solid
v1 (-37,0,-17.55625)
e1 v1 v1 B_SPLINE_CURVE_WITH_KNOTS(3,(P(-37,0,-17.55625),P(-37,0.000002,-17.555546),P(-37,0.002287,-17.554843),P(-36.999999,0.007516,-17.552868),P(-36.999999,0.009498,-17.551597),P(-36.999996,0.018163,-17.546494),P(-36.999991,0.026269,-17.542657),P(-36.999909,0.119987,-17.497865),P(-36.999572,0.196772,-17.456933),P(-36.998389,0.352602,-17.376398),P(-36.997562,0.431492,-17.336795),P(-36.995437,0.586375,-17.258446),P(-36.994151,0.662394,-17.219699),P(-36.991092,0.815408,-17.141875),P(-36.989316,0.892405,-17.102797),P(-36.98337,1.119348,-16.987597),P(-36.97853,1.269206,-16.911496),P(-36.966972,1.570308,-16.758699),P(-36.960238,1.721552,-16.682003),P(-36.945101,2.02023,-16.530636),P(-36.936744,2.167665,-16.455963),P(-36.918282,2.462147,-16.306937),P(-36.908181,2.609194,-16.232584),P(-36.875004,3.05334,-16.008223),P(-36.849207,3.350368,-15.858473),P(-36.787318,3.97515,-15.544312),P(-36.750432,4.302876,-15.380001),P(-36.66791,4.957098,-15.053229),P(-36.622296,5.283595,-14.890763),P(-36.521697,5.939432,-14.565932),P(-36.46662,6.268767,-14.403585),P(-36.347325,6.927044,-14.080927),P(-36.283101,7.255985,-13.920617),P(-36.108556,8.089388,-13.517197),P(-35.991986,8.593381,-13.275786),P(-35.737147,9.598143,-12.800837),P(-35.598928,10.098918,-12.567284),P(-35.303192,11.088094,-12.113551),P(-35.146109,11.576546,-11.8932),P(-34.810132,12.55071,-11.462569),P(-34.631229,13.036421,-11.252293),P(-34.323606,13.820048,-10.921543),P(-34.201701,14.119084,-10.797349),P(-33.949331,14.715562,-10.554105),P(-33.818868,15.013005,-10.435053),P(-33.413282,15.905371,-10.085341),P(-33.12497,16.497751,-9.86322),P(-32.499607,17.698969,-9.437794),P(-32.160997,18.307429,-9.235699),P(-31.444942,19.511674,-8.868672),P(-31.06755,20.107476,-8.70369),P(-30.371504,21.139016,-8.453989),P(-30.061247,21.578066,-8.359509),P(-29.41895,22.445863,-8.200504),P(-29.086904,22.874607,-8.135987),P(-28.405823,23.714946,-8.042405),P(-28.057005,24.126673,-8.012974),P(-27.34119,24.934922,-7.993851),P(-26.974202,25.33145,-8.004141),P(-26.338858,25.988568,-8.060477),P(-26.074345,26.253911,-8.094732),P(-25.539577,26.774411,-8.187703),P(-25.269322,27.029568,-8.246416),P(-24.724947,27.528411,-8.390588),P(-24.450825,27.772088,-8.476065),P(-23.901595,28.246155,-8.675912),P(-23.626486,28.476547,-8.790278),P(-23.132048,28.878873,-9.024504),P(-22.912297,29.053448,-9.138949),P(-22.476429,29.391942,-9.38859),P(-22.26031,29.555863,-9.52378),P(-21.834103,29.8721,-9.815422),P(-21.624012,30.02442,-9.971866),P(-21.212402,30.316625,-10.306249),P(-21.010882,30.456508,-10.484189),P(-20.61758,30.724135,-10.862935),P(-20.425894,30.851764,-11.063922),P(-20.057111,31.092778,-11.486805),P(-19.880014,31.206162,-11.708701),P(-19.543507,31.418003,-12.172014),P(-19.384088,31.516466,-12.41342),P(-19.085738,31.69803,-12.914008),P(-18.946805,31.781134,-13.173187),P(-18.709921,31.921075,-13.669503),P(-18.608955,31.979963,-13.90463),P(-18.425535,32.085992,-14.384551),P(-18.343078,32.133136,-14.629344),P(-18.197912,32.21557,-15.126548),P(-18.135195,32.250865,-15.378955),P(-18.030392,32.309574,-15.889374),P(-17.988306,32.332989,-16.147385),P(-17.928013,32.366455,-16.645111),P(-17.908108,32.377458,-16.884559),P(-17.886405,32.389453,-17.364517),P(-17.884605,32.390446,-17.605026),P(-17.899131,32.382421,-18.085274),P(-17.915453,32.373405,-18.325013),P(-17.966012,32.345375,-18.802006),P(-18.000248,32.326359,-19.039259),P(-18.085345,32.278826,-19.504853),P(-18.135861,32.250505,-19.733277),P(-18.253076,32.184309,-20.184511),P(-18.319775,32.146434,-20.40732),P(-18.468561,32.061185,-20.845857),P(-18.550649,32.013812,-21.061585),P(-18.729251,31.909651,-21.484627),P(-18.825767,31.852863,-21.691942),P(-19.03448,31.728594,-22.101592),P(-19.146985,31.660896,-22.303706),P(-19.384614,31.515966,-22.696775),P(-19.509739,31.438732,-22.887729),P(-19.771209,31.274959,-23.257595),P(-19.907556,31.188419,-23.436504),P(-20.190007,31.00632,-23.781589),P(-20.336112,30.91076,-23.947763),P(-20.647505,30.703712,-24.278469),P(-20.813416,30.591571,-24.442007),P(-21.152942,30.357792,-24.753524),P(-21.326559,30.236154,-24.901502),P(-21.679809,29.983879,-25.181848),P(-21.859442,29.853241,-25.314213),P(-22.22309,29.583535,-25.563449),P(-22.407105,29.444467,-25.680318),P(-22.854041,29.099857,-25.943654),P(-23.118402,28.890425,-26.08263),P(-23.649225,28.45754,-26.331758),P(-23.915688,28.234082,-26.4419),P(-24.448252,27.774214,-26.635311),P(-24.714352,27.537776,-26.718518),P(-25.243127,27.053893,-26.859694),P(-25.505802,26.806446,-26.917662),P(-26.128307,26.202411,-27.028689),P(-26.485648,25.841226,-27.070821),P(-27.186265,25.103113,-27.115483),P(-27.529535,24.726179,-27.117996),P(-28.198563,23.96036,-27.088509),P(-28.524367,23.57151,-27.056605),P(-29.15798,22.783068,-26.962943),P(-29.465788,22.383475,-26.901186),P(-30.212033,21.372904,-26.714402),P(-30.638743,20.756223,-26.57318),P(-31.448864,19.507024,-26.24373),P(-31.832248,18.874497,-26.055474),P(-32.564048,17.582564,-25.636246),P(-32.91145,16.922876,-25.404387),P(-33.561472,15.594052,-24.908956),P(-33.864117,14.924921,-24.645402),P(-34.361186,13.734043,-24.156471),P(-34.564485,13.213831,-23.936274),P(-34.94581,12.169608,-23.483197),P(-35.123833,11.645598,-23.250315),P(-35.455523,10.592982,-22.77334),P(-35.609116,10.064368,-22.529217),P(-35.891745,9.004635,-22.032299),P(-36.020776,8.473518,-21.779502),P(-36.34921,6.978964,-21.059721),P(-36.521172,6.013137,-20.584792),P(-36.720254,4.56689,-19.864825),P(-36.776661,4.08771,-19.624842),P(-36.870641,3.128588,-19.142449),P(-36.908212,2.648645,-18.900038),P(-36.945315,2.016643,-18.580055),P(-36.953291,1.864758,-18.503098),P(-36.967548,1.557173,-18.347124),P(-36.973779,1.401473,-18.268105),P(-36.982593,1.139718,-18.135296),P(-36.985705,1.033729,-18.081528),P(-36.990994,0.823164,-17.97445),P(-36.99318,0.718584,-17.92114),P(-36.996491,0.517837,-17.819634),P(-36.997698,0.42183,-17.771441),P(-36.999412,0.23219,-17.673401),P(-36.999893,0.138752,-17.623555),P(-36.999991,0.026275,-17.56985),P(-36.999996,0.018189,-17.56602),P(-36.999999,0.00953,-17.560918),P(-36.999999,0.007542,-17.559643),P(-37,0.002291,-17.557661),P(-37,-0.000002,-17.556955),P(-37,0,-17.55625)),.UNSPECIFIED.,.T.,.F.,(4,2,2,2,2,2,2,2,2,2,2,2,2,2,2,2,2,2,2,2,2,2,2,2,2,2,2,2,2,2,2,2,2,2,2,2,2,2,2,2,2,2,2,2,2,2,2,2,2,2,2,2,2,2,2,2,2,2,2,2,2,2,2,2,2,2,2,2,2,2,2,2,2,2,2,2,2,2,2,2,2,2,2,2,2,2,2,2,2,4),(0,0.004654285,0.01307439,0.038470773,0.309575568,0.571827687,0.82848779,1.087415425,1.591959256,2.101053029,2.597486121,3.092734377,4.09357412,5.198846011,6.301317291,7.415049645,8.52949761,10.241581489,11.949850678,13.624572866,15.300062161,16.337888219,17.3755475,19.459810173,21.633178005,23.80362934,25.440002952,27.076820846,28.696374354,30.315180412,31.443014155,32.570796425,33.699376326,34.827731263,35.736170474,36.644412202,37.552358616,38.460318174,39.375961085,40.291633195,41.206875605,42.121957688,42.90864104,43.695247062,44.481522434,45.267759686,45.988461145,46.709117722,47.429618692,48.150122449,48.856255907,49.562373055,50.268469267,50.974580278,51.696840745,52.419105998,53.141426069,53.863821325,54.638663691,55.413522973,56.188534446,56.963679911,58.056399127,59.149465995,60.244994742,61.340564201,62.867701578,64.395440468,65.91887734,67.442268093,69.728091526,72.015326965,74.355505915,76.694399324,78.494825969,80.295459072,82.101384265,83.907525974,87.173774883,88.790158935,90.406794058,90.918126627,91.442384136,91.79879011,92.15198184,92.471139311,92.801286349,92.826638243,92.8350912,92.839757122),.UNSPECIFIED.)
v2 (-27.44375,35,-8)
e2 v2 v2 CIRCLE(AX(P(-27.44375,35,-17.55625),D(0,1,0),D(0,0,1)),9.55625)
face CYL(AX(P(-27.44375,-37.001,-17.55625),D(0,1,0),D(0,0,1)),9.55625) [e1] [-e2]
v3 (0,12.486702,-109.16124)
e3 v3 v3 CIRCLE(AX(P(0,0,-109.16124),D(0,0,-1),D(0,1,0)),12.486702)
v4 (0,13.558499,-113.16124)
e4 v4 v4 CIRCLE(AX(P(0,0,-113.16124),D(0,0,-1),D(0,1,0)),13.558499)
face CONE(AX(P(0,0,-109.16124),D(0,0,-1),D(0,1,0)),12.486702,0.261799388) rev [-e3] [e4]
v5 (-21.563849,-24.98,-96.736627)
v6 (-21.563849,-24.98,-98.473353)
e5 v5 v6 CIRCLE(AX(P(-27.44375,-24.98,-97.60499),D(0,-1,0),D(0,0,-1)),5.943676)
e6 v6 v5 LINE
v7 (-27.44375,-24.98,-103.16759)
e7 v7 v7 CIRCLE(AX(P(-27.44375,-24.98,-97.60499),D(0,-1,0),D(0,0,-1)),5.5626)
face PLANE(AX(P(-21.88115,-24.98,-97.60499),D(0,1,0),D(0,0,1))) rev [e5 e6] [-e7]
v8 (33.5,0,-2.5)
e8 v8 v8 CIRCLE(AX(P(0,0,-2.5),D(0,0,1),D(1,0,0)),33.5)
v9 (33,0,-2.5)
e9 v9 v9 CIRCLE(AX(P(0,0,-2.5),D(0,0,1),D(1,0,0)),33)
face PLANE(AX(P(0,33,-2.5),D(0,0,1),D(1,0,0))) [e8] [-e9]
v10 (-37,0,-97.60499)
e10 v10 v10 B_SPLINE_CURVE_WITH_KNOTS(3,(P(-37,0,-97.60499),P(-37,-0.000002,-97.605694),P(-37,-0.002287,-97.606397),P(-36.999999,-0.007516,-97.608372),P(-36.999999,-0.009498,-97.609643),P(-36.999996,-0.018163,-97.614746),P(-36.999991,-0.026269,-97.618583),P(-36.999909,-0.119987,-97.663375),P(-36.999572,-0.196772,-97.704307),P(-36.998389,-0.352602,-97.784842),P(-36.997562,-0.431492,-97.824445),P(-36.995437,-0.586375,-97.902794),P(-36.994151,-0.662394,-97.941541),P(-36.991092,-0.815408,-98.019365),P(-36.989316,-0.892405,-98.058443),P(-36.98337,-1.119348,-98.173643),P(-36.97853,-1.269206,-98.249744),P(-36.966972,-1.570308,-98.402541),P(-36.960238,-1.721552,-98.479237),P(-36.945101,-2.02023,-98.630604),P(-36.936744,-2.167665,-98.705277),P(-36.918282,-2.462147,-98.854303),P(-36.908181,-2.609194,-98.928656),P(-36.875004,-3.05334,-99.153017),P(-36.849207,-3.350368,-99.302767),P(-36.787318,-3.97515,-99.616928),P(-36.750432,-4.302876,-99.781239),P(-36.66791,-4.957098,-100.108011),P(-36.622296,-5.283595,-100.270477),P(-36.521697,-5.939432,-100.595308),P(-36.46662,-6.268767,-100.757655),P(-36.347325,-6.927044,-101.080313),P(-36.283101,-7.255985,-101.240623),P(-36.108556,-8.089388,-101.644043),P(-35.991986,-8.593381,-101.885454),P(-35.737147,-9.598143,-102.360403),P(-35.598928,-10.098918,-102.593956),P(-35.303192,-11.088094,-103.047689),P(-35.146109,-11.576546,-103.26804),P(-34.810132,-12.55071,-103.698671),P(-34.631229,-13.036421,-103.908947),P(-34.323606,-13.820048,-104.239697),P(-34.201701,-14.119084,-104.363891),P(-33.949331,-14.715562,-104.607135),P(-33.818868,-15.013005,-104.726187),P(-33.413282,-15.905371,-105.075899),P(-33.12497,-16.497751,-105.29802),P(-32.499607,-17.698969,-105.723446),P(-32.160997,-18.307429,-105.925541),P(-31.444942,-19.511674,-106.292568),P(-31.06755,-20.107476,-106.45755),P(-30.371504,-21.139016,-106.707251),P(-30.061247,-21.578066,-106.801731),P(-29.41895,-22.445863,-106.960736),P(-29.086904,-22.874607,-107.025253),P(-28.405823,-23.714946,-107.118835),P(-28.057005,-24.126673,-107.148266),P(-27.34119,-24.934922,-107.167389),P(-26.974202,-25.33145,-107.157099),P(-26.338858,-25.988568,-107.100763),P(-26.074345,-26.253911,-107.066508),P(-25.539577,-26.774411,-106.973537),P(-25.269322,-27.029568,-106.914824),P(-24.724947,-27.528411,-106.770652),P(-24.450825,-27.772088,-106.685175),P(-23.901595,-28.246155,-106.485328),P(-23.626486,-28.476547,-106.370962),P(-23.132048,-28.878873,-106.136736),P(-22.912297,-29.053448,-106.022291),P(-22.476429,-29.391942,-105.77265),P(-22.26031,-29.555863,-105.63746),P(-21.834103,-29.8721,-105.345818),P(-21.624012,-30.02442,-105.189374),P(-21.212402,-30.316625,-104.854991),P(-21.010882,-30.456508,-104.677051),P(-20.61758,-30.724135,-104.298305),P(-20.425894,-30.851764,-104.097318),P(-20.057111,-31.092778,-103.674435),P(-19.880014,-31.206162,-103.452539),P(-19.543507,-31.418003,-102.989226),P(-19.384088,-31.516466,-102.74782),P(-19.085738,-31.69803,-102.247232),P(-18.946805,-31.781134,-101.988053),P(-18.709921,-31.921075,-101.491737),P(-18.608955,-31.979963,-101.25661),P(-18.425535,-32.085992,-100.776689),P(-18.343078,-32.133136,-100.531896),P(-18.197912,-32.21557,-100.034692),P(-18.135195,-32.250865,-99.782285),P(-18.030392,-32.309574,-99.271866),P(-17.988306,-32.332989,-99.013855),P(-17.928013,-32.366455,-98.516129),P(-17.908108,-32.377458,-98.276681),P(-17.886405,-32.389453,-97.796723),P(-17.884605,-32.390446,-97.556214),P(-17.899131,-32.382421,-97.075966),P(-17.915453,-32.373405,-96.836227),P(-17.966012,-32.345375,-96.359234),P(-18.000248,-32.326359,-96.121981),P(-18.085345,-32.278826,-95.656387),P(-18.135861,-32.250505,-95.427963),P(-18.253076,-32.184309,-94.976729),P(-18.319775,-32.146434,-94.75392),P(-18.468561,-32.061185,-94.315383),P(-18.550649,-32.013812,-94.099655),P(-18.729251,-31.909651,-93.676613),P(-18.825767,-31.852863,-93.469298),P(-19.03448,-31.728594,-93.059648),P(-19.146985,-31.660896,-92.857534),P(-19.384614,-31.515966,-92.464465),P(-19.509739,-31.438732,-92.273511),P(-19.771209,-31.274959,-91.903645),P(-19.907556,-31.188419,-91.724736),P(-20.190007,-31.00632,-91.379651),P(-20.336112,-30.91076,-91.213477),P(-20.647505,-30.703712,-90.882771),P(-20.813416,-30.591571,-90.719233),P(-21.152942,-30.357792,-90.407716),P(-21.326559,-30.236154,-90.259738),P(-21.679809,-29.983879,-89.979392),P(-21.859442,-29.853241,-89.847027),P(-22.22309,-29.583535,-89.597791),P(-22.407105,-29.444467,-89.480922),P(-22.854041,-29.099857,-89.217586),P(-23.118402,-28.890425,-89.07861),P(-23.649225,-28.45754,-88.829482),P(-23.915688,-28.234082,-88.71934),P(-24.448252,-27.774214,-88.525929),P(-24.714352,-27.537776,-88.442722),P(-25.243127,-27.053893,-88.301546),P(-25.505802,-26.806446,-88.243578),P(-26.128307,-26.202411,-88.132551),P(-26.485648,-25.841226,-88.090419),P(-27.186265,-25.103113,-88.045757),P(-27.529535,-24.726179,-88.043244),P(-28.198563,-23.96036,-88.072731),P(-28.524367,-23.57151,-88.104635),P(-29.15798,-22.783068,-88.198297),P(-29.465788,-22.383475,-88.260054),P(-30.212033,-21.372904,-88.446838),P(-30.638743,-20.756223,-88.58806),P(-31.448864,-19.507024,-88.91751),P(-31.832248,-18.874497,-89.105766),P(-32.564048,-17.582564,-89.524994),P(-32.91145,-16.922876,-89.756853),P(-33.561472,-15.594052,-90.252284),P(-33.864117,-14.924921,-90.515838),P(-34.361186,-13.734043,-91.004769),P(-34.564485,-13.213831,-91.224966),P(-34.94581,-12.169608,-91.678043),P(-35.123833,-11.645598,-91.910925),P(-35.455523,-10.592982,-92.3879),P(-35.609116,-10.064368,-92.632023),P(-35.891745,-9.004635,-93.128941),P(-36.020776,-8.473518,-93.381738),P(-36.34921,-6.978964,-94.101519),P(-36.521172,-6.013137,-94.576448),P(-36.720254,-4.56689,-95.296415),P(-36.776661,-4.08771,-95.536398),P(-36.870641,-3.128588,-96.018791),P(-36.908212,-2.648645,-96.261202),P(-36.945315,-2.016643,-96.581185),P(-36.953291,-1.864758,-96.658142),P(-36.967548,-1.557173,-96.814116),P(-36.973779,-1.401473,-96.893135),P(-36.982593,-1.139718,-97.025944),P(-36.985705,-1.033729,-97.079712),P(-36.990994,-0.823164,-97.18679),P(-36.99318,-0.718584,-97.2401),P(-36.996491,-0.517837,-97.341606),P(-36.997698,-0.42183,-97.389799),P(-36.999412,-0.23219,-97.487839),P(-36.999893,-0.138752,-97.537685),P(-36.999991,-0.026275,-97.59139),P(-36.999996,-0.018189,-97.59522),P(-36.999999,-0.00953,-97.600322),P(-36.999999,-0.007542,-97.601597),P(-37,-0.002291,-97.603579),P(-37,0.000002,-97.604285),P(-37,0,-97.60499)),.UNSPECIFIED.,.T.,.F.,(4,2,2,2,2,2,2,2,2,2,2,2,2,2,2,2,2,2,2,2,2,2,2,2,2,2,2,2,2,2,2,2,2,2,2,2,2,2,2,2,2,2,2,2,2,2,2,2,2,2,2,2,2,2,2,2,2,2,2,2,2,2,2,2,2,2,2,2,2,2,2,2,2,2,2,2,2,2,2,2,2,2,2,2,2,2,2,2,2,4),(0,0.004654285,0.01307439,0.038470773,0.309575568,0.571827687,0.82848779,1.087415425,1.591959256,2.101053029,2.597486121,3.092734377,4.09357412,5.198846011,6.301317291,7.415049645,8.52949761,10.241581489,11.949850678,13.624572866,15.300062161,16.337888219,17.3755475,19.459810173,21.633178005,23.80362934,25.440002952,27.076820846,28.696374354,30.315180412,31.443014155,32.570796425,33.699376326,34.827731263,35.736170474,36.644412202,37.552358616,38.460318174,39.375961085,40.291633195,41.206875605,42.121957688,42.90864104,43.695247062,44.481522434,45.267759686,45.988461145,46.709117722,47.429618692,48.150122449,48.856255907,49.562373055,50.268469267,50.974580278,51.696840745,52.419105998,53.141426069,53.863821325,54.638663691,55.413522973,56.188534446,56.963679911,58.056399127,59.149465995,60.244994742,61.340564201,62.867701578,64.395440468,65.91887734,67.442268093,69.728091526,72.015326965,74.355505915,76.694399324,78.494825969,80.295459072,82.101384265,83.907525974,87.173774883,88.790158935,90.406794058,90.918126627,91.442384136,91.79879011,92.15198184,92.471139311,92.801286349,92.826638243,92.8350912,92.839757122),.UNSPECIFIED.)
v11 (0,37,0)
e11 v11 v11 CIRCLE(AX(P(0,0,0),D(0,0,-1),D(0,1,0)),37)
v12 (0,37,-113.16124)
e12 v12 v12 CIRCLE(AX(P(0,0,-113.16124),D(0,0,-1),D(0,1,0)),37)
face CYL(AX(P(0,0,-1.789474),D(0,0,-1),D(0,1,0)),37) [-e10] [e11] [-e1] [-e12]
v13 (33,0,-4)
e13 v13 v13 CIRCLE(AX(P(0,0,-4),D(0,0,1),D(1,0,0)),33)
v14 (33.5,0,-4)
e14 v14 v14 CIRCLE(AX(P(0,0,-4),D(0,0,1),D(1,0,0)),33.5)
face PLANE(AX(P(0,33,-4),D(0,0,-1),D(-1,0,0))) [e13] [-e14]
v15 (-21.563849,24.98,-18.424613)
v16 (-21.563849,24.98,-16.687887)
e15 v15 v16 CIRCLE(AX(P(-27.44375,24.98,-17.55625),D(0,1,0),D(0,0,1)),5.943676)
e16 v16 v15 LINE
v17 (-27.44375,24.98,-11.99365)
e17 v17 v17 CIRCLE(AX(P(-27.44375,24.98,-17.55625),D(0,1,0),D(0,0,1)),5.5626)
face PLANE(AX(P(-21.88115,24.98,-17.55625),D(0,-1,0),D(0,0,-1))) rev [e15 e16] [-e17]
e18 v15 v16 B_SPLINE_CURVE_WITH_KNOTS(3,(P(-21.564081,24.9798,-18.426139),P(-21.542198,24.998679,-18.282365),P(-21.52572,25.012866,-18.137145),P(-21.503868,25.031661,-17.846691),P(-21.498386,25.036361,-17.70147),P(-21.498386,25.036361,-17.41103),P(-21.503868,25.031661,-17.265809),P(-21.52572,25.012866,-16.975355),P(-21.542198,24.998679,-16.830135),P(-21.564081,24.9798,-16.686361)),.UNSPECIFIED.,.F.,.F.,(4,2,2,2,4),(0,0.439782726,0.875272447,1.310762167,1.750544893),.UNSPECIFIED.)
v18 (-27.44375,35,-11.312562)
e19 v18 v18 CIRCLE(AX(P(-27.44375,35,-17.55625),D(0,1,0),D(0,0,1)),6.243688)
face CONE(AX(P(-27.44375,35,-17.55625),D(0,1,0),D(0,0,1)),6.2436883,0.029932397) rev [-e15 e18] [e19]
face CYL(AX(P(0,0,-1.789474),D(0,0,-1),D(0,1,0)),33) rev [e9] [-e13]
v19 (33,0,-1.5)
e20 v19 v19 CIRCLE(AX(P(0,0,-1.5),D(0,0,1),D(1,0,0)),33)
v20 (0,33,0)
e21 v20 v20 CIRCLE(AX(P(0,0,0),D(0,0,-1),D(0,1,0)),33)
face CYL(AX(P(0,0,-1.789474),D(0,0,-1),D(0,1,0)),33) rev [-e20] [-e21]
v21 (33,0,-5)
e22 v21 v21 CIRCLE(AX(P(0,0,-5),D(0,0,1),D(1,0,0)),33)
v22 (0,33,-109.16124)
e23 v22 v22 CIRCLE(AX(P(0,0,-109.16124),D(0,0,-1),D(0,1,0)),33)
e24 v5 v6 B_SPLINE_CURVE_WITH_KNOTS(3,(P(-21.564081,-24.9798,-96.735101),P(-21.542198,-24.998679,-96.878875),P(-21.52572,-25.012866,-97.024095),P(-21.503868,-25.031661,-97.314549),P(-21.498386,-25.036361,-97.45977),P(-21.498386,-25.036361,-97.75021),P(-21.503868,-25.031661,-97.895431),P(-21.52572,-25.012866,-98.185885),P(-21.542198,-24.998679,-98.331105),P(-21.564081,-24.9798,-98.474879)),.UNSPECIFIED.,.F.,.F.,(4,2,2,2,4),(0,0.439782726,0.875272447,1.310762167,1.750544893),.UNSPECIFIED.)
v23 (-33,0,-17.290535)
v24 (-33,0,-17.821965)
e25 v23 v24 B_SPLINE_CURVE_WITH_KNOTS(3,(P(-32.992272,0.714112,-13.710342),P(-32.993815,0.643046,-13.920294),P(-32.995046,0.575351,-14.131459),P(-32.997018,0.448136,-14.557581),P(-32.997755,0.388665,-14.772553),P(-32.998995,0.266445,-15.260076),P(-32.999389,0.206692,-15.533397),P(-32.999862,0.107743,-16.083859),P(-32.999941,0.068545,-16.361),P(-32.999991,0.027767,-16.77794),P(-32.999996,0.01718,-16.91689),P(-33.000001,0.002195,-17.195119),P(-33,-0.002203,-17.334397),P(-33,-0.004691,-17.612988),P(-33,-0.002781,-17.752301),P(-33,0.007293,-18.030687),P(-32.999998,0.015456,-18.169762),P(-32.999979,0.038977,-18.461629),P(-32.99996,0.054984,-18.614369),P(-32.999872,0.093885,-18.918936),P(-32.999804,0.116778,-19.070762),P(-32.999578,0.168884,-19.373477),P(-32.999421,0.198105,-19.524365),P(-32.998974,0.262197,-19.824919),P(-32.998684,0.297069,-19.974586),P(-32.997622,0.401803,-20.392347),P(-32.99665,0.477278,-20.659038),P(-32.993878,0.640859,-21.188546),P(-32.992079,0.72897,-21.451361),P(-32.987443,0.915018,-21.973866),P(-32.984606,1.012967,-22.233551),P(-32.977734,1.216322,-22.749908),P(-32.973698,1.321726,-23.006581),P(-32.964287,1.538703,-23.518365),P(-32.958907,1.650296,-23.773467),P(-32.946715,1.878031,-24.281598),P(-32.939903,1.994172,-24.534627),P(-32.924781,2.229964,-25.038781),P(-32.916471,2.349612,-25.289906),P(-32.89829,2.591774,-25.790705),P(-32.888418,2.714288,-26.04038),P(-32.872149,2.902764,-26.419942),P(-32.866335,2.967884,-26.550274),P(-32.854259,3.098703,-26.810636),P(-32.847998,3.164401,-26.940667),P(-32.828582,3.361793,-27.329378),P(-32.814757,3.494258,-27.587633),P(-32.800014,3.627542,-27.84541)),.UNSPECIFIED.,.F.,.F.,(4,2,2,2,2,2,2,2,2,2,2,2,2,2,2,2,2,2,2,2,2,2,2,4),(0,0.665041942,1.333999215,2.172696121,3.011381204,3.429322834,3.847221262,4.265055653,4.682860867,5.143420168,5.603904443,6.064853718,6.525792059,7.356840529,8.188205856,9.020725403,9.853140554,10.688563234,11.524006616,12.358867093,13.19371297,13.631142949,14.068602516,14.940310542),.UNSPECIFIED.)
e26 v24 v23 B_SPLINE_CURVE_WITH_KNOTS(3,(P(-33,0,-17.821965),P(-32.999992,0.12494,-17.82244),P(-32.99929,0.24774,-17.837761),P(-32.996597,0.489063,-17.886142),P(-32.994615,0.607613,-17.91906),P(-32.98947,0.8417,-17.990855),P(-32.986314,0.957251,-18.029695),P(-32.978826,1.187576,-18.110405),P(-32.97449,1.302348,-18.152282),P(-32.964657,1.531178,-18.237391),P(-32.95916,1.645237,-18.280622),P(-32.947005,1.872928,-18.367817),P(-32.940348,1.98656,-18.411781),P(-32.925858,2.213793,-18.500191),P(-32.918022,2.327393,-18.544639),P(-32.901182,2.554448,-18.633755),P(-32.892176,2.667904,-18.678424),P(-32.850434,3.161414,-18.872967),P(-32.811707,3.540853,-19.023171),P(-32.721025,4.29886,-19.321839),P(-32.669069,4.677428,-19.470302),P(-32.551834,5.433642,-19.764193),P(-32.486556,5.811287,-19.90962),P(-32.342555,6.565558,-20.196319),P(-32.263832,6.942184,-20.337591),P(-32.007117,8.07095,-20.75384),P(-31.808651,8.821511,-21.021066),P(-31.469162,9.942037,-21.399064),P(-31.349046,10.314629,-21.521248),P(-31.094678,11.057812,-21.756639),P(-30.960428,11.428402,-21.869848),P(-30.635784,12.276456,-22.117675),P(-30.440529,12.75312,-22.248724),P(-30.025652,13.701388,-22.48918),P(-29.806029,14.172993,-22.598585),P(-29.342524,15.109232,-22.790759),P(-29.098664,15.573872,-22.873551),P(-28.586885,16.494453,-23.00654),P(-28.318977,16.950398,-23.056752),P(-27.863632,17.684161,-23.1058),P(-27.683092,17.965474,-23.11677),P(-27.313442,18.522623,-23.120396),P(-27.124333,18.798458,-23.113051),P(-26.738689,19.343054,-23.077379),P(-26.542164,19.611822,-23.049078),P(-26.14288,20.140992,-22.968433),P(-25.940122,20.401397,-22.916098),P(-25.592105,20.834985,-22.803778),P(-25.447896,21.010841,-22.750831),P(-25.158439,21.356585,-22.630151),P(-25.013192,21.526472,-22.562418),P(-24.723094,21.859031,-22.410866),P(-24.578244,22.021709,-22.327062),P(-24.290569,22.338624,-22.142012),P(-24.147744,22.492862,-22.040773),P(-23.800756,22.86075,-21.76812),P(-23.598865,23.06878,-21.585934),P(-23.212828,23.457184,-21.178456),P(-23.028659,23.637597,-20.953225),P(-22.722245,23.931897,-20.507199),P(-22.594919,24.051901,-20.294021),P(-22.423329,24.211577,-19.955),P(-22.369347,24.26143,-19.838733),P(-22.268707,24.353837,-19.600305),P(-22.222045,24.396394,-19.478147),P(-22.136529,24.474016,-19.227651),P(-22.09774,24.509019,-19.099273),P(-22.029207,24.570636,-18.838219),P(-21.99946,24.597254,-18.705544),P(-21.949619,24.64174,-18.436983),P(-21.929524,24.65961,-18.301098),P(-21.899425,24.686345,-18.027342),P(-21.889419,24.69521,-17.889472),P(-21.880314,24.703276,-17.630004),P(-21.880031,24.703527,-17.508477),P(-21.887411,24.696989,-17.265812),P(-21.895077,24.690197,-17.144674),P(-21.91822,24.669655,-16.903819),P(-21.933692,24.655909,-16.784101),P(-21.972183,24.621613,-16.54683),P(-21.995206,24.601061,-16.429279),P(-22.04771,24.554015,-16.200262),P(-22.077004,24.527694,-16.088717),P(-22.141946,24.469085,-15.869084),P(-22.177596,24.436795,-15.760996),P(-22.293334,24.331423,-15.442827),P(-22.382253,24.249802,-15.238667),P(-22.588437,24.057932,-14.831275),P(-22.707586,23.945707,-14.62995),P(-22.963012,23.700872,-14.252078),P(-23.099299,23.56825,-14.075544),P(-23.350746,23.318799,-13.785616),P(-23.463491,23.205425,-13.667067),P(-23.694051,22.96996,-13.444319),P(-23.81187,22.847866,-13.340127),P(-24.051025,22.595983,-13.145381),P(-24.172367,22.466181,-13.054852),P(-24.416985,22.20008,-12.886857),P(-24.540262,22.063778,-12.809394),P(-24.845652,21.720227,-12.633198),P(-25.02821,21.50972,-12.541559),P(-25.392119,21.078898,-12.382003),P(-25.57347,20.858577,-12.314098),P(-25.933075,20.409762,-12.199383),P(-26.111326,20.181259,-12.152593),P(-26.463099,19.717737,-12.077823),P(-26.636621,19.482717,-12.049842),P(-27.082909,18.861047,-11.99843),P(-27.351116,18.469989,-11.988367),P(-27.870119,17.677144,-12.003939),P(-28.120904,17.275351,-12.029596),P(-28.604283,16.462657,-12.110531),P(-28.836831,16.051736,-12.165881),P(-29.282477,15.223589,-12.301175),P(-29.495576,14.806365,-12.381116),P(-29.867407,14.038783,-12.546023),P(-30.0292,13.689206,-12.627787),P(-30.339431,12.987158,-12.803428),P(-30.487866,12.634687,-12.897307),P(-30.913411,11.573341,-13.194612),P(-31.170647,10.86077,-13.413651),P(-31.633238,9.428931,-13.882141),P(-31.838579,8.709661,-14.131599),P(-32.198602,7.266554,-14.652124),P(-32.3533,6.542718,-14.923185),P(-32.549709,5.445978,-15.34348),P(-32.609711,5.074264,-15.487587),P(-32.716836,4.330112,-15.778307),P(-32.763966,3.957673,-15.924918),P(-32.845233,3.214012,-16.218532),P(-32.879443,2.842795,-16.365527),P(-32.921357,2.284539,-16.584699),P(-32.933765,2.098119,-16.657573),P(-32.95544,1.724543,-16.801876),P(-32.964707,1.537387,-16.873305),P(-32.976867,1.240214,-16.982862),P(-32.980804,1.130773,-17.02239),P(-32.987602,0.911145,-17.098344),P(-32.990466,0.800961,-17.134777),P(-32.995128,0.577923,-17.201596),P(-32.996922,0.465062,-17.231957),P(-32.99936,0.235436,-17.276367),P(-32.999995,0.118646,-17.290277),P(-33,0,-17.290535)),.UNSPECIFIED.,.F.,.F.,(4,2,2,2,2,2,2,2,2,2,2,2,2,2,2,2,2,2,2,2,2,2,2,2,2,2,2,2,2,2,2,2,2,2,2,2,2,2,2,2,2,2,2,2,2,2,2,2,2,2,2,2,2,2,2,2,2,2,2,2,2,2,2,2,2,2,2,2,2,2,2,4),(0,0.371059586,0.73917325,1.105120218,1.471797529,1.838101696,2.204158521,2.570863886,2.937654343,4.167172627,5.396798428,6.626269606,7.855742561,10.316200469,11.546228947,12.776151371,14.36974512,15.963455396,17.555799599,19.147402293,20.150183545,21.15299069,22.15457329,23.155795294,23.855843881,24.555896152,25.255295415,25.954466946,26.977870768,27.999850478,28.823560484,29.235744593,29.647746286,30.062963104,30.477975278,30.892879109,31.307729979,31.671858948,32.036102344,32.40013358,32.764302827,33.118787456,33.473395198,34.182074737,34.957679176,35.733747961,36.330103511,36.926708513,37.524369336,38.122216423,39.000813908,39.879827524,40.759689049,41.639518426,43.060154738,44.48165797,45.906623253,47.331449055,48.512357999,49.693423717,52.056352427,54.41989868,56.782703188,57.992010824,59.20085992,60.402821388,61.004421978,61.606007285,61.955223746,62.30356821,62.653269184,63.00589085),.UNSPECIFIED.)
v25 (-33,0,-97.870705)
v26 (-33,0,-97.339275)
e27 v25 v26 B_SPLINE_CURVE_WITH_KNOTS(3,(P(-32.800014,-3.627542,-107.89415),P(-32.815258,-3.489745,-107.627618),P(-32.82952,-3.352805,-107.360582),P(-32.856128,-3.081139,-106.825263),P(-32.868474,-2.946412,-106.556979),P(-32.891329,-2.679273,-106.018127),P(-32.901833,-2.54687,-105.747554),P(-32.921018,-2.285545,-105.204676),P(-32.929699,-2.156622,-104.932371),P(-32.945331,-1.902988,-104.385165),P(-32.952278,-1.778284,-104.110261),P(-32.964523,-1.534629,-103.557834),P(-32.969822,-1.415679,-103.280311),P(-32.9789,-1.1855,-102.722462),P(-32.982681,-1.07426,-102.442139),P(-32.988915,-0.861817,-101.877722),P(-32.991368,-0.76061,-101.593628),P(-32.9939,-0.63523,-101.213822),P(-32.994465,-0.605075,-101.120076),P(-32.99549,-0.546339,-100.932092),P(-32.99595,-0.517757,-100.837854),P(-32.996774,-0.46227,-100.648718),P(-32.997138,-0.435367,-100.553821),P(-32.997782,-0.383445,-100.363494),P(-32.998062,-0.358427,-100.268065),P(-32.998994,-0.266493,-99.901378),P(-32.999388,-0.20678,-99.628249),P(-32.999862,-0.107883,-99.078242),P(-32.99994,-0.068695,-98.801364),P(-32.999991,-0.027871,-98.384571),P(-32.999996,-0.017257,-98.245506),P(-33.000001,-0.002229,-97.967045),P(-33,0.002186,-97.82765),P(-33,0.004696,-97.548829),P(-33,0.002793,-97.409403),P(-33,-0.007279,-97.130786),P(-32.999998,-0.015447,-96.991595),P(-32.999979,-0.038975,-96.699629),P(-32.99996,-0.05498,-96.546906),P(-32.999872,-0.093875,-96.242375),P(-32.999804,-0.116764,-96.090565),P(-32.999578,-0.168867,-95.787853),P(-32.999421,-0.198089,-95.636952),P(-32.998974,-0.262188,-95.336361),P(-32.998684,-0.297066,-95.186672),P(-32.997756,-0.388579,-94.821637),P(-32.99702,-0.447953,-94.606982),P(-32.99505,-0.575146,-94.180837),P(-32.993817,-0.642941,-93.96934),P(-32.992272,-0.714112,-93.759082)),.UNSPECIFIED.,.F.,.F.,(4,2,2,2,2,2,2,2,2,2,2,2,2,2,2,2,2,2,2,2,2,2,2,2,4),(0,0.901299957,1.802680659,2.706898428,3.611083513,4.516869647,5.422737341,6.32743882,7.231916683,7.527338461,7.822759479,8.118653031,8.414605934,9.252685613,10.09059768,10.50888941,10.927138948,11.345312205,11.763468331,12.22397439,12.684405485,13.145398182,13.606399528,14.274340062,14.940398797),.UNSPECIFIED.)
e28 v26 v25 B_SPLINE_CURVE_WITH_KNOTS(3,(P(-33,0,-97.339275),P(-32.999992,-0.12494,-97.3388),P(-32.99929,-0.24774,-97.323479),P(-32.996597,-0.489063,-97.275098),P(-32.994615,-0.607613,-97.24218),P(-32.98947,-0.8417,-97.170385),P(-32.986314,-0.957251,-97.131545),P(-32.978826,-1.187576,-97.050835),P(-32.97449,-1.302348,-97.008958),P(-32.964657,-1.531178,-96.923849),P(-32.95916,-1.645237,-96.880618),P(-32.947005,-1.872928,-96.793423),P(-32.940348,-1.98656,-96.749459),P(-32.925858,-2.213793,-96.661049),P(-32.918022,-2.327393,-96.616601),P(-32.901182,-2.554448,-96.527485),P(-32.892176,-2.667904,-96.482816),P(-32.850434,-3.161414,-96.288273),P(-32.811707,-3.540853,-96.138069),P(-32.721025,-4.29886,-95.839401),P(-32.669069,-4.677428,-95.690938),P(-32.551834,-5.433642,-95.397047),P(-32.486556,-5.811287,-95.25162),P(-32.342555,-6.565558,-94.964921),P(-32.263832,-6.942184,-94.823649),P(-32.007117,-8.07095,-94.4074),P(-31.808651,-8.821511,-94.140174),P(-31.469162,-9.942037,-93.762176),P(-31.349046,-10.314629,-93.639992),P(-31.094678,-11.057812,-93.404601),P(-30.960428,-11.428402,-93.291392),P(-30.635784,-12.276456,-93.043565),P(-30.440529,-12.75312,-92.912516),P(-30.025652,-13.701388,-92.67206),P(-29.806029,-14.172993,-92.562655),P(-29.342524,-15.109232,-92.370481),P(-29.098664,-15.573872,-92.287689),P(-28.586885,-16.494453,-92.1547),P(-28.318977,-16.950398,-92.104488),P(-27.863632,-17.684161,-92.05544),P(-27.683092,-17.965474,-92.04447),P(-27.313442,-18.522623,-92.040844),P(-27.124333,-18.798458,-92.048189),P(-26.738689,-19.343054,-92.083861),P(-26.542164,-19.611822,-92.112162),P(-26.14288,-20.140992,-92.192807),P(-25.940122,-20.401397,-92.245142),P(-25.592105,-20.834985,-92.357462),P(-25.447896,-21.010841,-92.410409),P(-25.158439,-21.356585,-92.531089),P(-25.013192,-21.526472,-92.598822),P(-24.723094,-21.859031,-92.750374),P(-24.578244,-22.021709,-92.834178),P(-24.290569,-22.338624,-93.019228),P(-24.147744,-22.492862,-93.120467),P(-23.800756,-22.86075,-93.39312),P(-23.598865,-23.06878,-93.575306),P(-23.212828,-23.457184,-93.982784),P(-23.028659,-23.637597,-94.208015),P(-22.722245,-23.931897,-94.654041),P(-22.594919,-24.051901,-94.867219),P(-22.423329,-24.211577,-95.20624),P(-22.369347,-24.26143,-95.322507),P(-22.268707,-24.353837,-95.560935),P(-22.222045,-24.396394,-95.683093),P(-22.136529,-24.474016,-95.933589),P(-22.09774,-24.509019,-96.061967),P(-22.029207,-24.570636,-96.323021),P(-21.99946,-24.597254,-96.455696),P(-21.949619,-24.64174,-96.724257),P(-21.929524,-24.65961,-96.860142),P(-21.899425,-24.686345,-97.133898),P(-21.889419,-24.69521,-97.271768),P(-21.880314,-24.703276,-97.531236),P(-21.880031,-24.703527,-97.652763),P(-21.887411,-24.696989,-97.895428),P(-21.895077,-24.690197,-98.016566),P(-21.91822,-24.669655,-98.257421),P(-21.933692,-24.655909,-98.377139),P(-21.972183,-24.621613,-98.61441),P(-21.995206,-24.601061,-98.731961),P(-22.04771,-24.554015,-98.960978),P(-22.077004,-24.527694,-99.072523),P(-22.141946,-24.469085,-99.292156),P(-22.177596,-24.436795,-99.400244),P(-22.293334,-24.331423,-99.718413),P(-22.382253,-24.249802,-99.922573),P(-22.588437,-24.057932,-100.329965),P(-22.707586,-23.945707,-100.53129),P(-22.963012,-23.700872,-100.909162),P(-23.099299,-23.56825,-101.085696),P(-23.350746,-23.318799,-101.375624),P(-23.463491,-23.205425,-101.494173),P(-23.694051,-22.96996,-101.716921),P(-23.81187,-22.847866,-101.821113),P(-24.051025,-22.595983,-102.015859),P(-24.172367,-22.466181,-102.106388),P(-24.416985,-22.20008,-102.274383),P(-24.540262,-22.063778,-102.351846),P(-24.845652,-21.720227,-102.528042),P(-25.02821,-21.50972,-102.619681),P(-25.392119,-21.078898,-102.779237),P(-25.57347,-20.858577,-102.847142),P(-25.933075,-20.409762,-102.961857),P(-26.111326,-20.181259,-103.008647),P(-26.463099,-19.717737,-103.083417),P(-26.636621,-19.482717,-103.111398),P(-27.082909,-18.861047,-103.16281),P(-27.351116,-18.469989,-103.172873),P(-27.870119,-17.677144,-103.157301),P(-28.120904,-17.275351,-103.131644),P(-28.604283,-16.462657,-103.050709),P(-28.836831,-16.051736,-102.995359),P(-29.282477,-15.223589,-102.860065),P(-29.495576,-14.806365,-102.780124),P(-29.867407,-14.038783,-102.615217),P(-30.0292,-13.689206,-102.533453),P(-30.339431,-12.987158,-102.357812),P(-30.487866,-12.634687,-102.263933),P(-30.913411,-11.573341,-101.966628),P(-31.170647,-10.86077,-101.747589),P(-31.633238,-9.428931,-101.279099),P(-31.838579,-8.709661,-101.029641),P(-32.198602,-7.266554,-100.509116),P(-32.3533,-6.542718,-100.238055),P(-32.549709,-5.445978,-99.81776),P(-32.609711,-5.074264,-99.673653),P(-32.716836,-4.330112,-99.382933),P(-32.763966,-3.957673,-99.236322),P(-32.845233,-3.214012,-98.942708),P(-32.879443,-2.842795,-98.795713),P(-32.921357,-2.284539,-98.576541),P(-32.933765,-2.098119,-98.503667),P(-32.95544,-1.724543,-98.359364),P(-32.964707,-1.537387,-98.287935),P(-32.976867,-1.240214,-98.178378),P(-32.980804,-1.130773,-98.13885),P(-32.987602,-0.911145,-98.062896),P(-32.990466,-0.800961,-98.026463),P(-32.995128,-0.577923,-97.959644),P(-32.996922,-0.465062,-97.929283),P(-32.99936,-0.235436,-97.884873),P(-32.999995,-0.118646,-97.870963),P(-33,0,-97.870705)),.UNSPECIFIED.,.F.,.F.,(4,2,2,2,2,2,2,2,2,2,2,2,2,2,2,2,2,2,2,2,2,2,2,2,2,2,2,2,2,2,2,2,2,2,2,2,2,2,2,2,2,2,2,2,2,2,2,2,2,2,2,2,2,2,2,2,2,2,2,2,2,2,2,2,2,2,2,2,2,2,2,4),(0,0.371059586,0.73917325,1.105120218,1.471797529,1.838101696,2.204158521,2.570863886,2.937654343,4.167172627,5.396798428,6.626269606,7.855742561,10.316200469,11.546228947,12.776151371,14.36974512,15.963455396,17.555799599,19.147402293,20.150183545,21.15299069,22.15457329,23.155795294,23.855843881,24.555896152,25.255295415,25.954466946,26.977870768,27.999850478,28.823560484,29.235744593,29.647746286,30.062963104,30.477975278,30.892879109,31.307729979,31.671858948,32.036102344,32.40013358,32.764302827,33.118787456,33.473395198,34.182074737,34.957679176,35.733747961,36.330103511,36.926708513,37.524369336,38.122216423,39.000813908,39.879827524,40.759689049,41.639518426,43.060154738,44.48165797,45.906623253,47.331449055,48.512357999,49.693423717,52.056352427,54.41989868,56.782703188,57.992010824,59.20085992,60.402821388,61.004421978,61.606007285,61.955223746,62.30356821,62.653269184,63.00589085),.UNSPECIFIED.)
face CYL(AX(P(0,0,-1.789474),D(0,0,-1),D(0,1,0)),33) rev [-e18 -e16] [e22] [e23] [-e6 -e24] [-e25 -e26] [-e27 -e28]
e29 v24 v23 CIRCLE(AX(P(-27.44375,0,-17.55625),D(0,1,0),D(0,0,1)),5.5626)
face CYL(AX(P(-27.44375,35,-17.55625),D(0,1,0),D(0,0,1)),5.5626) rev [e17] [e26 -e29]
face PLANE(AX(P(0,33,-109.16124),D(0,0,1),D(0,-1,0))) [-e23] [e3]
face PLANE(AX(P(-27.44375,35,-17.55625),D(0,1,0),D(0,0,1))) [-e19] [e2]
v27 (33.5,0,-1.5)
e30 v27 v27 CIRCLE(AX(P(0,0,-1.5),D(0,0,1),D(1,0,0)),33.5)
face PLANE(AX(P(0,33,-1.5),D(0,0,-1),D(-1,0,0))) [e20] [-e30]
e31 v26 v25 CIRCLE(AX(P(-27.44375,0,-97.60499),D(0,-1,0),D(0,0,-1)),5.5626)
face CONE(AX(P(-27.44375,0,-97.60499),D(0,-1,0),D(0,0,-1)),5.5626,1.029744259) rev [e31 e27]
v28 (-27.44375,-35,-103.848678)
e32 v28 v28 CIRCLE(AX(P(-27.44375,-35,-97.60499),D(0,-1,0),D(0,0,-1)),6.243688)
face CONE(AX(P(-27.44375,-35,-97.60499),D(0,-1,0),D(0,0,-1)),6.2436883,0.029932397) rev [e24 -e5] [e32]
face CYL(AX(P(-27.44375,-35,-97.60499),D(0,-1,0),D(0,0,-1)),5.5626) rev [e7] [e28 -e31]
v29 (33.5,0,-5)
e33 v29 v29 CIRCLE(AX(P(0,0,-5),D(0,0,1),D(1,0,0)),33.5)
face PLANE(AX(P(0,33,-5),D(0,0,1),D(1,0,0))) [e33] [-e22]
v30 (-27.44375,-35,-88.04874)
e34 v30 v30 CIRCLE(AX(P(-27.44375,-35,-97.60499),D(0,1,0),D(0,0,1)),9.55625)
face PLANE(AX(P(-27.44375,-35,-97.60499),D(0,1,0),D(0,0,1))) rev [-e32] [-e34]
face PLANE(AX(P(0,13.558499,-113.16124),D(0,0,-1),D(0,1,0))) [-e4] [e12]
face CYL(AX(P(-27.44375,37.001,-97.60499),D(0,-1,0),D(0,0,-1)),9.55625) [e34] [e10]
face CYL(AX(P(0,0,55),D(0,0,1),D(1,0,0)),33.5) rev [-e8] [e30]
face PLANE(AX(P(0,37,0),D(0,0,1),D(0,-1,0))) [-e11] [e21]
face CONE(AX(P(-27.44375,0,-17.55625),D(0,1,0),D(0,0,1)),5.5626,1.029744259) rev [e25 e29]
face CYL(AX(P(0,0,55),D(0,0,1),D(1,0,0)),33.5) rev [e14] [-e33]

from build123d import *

# Parameters (mm, degrees)
SKETCH2_W                    = 1
SKETCH2_H                    = 0.5
WELD_BUNGS_INLET_REACH       = 161.673
WELD_START                   = 35
SKETCH3_R                    = 9.55625
WELD_BUNGS_OUTLET_REACH      = 161.673
WELD_BUNGS_OUTLET_END_RADIUS = 37
WELD_START_2                 = -35
SKETCH6_R                    = 9.55625


with BuildPart() as part:
    # Sketch1 → Main Base (revolve)
    with BuildSketch(Plane(origin=(0, 0, 0), x_dir=(0, 0, -1), z_dir=(1, 0, 0))):
        Polygon((0, 33), (109.16124, 33), (109.16124, 12.486702), (113.16124, 13.55849877), (113.16124, 37), (0, 37), align=None)
    revolve(axis=Axis((0, 0, -1.789473684), (0, 0, 1)))

    # Sketch2 → Radial O-Ring (revolve, cut)
    with BuildSketch(Plane(origin=(0, 0, 0), x_dir=(0, 0, -1), z_dir=(1, 0, 0)), mode=Mode.PRIVATE) as radial_o_ring_sk:
        with Locations((2, 33.25)):
            Rectangle(SKETCH2_W, SKETCH2_H)
        with Locations((4.5, 33.25)):
            Rectangle(SKETCH2_W, SKETCH2_H)
    revolve(radial_o_ring_sk.sketch.rotate(Axis((0, 0, 55), (0, 0, -1)), 90), axis=Axis((0, 0, 55), (0, 0, -1)), mode=Mode.SUBTRACT)

    # Sketch3 → Weld Bungs Inlet (add, up to next)
    with BuildSketch(Plane(origin=(0, 0, 0), x_dir=(1, 0, 0), z_dir=(0, 1, 0)).offset(WELD_START), mode=Mode.PRIVATE) as weld_bungs_inlet_sk1:
        with Locations(Location((-27.44375, 17.55625, 0), (0, 0, 270))):
            Circle(SKETCH3_R)
    weld_bungs_inlet_tool1 = extrude(weld_bungs_inlet_sk1.sketch, amount=-WELD_BUNGS_INLET_REACH, mode=Mode.PRIVATE) - part.part
    add(weld_bungs_inlet_tool1.solids().sort_by_distance((-27.44375, 35, -17.55625))[0])

    # Weld Bungs Outlet: up to this cylinder (the profile starts outside it)
    weld_bungs_outlet_end = Plane(origin=(0, 0, -97.60499), z_dir=(0, 0, -1)) * Cylinder(WELD_BUNGS_OUTLET_END_RADIUS, 398.346, mode=Mode.PRIVATE)
    # Sketch6 → Weld Bungs Outlet (add, up to the surface)
    with BuildSketch(Plane(origin=(0, 0, 0), x_dir=(1, 0, 0), z_dir=(0, 1, 0)).offset(WELD_START_2), mode=Mode.PRIVATE) as weld_bungs_outlet_sk1:
        with Locations(Location((-27.44375, 97.60499, 0), (0, 0, 180))):
            Circle(SKETCH6_R)
    weld_bungs_outlet_tool1 = extrude(weld_bungs_outlet_sk1.sketch, amount=WELD_BUNGS_OUTLET_REACH, mode=Mode.PRIVATE) - weld_bungs_outlet_end
    add(weld_bungs_outlet_tool1.solids().sort_by_distance((-27.44375, -35, -97.60499))[0])

    # Sketch5 → 1/4 NPT Tapped Hole1 (revolve, cut)
    with BuildSketch(Plane(origin=(-27.44375, 35, -17.55625), x_dir=(0, 0, 1), z_dir=(1, 0, 0))):
        Polygon((0, 0), (0, 38.341347279), (5.5626, 34.999), (5.5626, 10.02), (5.943676082, 10.02), (6.2436883, 0), align=None)
    revolve(axis=Axis((-27.44375, 41.35, -17.55625), (0, -1, 0)), mode=Mode.SUBTRACT)

    # Sketch8 → 1/4 NPT Tapped Hole2 (revolve, cut)
    with BuildSketch(Plane(origin=(-27.44375, -35, -97.60499), x_dir=(0, 0, -1), z_dir=(1, 0, 0))):
        Polygon((0, 0), (0, 38.341347279), (5.5626, 34.999), (5.5626, 10.02), (5.943676082, 10.02), (6.2436883, 0), align=None)
    revolve(axis=Axis((-27.44375, -41.35, -97.60499), (0, 1, 0)), mode=Mode.SUBTRACT)


solid = part.part
